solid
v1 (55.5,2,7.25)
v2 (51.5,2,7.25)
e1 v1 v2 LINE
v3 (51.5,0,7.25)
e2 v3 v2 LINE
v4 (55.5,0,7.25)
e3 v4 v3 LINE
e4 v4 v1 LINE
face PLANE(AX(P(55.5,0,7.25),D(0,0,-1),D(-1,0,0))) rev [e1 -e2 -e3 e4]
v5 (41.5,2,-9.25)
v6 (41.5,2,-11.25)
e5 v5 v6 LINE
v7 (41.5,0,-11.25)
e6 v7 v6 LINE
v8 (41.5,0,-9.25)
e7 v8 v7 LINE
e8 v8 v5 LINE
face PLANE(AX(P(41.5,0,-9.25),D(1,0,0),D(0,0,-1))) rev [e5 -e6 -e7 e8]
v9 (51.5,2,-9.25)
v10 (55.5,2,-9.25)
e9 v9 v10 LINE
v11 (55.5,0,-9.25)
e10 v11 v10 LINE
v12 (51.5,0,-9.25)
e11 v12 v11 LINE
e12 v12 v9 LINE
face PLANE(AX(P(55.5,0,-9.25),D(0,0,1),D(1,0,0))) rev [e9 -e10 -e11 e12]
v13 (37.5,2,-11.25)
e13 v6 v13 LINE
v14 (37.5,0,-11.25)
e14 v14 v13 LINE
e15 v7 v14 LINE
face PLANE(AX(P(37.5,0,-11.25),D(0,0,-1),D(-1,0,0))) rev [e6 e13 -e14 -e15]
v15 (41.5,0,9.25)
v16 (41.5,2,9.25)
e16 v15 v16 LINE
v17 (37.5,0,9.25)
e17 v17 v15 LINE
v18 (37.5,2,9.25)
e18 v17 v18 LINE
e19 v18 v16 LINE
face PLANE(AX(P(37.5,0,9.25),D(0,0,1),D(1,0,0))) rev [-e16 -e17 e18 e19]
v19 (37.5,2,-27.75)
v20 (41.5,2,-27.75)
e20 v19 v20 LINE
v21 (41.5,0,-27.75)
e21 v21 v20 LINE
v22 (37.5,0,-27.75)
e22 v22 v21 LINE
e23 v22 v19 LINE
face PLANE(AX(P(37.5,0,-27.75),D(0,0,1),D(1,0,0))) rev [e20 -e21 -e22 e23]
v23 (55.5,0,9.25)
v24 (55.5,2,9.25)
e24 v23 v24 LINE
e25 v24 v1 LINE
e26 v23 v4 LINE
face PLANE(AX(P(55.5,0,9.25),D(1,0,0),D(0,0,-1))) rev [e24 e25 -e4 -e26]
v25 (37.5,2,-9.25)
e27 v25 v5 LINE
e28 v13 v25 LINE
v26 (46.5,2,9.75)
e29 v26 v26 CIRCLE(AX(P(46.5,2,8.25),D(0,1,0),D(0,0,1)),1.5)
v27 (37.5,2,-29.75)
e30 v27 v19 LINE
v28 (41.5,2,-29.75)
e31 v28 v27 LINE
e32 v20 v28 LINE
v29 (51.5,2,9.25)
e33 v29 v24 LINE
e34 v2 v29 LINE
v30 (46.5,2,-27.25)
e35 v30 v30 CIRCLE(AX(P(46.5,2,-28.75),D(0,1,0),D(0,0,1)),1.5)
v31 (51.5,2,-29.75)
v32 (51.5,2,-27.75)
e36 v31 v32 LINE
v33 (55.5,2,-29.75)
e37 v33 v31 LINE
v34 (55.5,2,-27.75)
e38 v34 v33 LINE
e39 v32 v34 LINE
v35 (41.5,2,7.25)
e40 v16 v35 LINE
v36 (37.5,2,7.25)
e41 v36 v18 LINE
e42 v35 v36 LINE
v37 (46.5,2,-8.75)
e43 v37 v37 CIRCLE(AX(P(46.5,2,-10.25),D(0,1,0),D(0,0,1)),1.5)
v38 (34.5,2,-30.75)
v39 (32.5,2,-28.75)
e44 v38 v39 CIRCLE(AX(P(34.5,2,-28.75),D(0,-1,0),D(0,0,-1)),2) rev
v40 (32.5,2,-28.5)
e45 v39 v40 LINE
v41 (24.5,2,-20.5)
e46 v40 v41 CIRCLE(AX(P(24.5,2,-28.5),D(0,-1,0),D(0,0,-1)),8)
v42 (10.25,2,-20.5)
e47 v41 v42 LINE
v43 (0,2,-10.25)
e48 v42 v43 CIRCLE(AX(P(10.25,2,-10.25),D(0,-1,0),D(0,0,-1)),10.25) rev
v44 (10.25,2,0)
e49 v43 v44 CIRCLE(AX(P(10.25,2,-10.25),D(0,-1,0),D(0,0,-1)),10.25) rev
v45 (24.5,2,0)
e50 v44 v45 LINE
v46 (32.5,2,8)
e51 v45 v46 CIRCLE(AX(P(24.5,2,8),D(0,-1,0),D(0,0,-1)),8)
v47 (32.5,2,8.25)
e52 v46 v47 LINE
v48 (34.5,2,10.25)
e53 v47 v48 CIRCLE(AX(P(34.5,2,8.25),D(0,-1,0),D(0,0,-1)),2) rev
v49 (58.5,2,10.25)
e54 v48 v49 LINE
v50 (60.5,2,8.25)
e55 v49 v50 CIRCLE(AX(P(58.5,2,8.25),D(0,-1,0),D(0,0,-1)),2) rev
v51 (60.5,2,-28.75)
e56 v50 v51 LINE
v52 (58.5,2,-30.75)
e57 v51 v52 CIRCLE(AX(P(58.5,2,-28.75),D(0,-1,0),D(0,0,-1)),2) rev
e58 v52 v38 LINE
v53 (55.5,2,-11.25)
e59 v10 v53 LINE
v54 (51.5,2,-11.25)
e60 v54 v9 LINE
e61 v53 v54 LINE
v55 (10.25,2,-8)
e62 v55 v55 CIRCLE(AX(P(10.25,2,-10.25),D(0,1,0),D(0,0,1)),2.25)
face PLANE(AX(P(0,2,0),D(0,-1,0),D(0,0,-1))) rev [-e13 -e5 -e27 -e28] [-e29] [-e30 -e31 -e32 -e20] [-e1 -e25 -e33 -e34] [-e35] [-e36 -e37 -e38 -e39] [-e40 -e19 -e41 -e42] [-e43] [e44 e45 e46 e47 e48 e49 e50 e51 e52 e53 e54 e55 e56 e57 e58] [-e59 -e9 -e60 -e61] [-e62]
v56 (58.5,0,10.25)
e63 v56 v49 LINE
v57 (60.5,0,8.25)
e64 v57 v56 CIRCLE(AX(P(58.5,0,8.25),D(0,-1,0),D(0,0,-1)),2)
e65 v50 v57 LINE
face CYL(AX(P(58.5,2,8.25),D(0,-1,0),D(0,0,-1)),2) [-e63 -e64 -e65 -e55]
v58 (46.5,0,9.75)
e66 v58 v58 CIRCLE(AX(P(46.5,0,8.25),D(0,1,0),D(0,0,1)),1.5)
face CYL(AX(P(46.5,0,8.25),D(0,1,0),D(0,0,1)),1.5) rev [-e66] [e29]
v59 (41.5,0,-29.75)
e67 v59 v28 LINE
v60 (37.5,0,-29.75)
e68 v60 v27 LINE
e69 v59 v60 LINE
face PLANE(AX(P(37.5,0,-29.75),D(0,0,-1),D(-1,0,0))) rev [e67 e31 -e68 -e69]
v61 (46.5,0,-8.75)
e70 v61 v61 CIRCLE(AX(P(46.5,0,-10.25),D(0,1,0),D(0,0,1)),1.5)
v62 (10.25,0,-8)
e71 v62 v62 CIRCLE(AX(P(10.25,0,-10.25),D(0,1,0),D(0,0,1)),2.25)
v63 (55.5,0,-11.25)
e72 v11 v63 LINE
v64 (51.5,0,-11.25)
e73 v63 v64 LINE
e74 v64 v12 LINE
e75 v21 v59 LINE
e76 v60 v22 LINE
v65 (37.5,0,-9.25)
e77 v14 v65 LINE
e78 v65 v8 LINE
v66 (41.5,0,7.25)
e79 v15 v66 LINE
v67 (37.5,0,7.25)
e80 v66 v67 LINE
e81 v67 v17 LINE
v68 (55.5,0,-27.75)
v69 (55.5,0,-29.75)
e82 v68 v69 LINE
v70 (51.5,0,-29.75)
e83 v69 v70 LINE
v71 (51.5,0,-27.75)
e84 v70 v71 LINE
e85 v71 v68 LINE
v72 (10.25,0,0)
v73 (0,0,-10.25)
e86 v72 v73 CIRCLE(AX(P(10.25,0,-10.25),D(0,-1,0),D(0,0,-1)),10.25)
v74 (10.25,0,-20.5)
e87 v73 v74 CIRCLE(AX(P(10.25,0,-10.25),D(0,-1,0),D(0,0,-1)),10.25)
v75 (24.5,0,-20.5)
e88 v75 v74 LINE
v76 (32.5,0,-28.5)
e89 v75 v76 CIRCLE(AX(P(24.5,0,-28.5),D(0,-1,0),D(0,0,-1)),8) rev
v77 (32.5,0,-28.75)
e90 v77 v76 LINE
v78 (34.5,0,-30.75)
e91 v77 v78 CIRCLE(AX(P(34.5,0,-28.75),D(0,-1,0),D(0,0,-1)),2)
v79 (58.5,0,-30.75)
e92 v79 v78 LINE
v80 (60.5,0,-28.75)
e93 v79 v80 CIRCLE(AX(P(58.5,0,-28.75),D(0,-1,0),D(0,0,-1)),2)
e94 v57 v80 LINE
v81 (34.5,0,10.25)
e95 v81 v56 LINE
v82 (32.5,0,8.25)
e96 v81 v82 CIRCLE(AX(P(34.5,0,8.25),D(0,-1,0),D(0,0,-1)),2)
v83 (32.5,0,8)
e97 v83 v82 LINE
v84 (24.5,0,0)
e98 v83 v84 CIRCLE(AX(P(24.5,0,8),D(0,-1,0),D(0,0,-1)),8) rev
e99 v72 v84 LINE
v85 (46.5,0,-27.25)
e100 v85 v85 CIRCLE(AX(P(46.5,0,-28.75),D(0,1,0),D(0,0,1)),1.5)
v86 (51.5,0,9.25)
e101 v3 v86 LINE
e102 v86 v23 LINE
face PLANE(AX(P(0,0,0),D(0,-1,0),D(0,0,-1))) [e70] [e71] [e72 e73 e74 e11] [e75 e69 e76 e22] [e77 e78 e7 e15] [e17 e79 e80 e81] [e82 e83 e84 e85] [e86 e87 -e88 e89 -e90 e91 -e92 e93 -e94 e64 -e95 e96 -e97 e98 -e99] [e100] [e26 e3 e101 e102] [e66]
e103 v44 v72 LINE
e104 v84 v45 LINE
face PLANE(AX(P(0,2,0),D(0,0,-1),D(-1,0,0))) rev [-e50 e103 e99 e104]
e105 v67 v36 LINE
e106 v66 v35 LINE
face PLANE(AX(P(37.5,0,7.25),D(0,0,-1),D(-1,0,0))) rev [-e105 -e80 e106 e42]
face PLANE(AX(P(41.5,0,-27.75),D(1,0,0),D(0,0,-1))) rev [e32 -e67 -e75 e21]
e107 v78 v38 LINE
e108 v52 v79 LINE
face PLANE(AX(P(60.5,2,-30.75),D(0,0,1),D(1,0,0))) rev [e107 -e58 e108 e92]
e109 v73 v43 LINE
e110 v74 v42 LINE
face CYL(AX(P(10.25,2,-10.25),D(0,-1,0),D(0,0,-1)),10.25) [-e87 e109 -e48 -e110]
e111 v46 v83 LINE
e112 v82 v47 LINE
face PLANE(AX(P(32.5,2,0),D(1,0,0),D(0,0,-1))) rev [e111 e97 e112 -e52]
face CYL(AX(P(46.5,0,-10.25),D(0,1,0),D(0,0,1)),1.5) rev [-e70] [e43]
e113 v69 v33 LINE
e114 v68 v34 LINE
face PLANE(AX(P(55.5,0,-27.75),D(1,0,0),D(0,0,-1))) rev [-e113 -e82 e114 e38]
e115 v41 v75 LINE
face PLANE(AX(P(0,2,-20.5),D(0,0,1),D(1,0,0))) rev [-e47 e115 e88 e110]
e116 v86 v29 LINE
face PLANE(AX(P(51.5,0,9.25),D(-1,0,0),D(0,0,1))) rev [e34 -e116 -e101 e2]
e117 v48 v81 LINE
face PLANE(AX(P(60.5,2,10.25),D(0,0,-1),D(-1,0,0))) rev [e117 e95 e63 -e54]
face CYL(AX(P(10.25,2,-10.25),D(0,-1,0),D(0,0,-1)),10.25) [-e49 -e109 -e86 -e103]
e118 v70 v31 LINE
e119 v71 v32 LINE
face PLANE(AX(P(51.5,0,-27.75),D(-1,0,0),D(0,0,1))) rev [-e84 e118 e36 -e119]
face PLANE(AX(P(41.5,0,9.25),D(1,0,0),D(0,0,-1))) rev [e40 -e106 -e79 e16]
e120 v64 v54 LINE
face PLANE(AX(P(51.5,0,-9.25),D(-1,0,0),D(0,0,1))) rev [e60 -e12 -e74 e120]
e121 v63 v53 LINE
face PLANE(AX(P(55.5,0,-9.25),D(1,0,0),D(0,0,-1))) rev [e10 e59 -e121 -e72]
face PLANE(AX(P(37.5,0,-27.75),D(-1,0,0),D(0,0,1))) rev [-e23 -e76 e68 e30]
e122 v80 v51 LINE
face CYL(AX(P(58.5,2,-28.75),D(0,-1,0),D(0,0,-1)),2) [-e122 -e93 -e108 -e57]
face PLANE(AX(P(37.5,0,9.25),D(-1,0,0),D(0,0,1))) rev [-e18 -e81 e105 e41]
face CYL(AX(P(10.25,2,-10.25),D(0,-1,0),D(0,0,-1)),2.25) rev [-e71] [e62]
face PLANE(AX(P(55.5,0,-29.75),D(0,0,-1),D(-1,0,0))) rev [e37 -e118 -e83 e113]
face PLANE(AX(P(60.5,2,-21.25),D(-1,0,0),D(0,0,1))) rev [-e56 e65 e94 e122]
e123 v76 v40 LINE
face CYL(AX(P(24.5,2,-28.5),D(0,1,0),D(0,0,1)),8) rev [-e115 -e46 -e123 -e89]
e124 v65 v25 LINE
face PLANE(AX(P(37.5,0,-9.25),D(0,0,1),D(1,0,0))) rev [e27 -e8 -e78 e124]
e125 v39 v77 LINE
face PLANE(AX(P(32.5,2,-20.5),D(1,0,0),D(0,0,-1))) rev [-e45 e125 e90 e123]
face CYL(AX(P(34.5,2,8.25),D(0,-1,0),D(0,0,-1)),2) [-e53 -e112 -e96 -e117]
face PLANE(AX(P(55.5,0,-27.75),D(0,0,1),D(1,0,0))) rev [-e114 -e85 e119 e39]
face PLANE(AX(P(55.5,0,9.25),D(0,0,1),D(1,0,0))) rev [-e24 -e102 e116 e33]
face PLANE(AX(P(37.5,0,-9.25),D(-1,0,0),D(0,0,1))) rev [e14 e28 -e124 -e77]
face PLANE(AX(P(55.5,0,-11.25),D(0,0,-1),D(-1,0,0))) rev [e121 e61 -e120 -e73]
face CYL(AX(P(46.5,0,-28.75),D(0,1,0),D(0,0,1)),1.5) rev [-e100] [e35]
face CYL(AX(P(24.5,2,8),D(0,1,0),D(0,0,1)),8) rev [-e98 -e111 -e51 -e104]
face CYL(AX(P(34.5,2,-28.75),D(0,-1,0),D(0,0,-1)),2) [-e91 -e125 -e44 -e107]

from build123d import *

# Parameters (mm, degrees)
SKETCH1_R           = 2.25
BOSS_EXTRUDE1_DEPTH = 2
FILLET1_R           = 10.25
FILLET2_R           = 2
SKETCH2_R           = 1.5
SKETCH2_W           = 4
SKETCH2_H           = 2
CUT_EXTRUDE1_DEPTH  = 2
FILLET3_R           = 8


with BuildPart() as part:
    # Sketch1 → Boss-Extrude1 (new body)
    with BuildSketch(Plane(origin=(0, 0, 0), x_dir=(1, 0, 0), z_dir=(0, 1, 0))):
        Polygon((0, 0), (32.5, 0), (32.5, -10.25), (60.5, -10.25), (60.5, -0.75), (60.5, 21.25), (60.5, 30.75), (32.5, 30.75), (32.5, 20.5), (0, 20.5), align=None)
        with Locations(Location((10.25, 10.25, 0), (0, 0, 270))):
            Circle(SKETCH1_R, mode=Mode.SUBTRACT)
    extrude(amount=BOSS_EXTRUDE1_DEPTH)

    # Fillet1
    fillet1_edges = [part.edges().sort_by_distance(p)[0] for p in [
        (0, 1, -20.5),
        (0, 1, 0),
    ]]
    fillet(fillet1_edges, radius=FILLET1_R - 0.0001)  # a hair under: the kernel refuses the full size

    # Fillet2
    fillet2_edges = [part.edges().sort_by_distance(p)[0] for p in [
        (32.5, 1, -30.75),
        (60.5, 1, -30.75),
        (60.5, 1, 10.25),
        (32.5, 1, 10.25),
    ]]
    fillet(fillet2_edges, radius=FILLET2_R)

    # Sketch2 → Cut-Extrude1 (cut)
    with BuildSketch(Plane(origin=(0, 2, 0), x_dir=(1, 0, 0), z_dir=(0, 1, 0))):
        with Locations(Location((46.5, 28.75, 0), (0, 0, 270))):
            Circle(SKETCH2_R)
        with Locations(Location((46.5, 10.25, 0), (0, 0, 270))):
            Circle(SKETCH2_R)
        with Locations(Location((46.5, -8.25, 0), (0, 0, 270))):
            Circle(SKETCH2_R)
        with Locations((39.5, 28.75)):
            Rectangle(SKETCH2_W, SKETCH2_H)
        with Locations((53.5, 28.75)):
            Rectangle(SKETCH2_W, SKETCH2_H)
        with Locations((39.5, 10.25)):
            Rectangle(SKETCH2_W, SKETCH2_H)
        with Locations((53.5, 10.25)):
            Rectangle(SKETCH2_W, SKETCH2_H)
        with Locations((39.5, -8.25)):
            Rectangle(SKETCH2_W, SKETCH2_H)
        with Locations((53.5, -8.25)):
            Rectangle(SKETCH2_W, SKETCH2_H)
    extrude(amount=-CUT_EXTRUDE1_DEPTH, mode=Mode.SUBTRACT)

    # Fillet3
    fillet3_edges = [part.edges().sort_by_distance(p)[0] for p in [
        (32.5, 1, -20.5),
        (32.5, 1, 0),
    ]]
    fillet(fillet3_edges, radius=FILLET3_R)


solid = part.part
